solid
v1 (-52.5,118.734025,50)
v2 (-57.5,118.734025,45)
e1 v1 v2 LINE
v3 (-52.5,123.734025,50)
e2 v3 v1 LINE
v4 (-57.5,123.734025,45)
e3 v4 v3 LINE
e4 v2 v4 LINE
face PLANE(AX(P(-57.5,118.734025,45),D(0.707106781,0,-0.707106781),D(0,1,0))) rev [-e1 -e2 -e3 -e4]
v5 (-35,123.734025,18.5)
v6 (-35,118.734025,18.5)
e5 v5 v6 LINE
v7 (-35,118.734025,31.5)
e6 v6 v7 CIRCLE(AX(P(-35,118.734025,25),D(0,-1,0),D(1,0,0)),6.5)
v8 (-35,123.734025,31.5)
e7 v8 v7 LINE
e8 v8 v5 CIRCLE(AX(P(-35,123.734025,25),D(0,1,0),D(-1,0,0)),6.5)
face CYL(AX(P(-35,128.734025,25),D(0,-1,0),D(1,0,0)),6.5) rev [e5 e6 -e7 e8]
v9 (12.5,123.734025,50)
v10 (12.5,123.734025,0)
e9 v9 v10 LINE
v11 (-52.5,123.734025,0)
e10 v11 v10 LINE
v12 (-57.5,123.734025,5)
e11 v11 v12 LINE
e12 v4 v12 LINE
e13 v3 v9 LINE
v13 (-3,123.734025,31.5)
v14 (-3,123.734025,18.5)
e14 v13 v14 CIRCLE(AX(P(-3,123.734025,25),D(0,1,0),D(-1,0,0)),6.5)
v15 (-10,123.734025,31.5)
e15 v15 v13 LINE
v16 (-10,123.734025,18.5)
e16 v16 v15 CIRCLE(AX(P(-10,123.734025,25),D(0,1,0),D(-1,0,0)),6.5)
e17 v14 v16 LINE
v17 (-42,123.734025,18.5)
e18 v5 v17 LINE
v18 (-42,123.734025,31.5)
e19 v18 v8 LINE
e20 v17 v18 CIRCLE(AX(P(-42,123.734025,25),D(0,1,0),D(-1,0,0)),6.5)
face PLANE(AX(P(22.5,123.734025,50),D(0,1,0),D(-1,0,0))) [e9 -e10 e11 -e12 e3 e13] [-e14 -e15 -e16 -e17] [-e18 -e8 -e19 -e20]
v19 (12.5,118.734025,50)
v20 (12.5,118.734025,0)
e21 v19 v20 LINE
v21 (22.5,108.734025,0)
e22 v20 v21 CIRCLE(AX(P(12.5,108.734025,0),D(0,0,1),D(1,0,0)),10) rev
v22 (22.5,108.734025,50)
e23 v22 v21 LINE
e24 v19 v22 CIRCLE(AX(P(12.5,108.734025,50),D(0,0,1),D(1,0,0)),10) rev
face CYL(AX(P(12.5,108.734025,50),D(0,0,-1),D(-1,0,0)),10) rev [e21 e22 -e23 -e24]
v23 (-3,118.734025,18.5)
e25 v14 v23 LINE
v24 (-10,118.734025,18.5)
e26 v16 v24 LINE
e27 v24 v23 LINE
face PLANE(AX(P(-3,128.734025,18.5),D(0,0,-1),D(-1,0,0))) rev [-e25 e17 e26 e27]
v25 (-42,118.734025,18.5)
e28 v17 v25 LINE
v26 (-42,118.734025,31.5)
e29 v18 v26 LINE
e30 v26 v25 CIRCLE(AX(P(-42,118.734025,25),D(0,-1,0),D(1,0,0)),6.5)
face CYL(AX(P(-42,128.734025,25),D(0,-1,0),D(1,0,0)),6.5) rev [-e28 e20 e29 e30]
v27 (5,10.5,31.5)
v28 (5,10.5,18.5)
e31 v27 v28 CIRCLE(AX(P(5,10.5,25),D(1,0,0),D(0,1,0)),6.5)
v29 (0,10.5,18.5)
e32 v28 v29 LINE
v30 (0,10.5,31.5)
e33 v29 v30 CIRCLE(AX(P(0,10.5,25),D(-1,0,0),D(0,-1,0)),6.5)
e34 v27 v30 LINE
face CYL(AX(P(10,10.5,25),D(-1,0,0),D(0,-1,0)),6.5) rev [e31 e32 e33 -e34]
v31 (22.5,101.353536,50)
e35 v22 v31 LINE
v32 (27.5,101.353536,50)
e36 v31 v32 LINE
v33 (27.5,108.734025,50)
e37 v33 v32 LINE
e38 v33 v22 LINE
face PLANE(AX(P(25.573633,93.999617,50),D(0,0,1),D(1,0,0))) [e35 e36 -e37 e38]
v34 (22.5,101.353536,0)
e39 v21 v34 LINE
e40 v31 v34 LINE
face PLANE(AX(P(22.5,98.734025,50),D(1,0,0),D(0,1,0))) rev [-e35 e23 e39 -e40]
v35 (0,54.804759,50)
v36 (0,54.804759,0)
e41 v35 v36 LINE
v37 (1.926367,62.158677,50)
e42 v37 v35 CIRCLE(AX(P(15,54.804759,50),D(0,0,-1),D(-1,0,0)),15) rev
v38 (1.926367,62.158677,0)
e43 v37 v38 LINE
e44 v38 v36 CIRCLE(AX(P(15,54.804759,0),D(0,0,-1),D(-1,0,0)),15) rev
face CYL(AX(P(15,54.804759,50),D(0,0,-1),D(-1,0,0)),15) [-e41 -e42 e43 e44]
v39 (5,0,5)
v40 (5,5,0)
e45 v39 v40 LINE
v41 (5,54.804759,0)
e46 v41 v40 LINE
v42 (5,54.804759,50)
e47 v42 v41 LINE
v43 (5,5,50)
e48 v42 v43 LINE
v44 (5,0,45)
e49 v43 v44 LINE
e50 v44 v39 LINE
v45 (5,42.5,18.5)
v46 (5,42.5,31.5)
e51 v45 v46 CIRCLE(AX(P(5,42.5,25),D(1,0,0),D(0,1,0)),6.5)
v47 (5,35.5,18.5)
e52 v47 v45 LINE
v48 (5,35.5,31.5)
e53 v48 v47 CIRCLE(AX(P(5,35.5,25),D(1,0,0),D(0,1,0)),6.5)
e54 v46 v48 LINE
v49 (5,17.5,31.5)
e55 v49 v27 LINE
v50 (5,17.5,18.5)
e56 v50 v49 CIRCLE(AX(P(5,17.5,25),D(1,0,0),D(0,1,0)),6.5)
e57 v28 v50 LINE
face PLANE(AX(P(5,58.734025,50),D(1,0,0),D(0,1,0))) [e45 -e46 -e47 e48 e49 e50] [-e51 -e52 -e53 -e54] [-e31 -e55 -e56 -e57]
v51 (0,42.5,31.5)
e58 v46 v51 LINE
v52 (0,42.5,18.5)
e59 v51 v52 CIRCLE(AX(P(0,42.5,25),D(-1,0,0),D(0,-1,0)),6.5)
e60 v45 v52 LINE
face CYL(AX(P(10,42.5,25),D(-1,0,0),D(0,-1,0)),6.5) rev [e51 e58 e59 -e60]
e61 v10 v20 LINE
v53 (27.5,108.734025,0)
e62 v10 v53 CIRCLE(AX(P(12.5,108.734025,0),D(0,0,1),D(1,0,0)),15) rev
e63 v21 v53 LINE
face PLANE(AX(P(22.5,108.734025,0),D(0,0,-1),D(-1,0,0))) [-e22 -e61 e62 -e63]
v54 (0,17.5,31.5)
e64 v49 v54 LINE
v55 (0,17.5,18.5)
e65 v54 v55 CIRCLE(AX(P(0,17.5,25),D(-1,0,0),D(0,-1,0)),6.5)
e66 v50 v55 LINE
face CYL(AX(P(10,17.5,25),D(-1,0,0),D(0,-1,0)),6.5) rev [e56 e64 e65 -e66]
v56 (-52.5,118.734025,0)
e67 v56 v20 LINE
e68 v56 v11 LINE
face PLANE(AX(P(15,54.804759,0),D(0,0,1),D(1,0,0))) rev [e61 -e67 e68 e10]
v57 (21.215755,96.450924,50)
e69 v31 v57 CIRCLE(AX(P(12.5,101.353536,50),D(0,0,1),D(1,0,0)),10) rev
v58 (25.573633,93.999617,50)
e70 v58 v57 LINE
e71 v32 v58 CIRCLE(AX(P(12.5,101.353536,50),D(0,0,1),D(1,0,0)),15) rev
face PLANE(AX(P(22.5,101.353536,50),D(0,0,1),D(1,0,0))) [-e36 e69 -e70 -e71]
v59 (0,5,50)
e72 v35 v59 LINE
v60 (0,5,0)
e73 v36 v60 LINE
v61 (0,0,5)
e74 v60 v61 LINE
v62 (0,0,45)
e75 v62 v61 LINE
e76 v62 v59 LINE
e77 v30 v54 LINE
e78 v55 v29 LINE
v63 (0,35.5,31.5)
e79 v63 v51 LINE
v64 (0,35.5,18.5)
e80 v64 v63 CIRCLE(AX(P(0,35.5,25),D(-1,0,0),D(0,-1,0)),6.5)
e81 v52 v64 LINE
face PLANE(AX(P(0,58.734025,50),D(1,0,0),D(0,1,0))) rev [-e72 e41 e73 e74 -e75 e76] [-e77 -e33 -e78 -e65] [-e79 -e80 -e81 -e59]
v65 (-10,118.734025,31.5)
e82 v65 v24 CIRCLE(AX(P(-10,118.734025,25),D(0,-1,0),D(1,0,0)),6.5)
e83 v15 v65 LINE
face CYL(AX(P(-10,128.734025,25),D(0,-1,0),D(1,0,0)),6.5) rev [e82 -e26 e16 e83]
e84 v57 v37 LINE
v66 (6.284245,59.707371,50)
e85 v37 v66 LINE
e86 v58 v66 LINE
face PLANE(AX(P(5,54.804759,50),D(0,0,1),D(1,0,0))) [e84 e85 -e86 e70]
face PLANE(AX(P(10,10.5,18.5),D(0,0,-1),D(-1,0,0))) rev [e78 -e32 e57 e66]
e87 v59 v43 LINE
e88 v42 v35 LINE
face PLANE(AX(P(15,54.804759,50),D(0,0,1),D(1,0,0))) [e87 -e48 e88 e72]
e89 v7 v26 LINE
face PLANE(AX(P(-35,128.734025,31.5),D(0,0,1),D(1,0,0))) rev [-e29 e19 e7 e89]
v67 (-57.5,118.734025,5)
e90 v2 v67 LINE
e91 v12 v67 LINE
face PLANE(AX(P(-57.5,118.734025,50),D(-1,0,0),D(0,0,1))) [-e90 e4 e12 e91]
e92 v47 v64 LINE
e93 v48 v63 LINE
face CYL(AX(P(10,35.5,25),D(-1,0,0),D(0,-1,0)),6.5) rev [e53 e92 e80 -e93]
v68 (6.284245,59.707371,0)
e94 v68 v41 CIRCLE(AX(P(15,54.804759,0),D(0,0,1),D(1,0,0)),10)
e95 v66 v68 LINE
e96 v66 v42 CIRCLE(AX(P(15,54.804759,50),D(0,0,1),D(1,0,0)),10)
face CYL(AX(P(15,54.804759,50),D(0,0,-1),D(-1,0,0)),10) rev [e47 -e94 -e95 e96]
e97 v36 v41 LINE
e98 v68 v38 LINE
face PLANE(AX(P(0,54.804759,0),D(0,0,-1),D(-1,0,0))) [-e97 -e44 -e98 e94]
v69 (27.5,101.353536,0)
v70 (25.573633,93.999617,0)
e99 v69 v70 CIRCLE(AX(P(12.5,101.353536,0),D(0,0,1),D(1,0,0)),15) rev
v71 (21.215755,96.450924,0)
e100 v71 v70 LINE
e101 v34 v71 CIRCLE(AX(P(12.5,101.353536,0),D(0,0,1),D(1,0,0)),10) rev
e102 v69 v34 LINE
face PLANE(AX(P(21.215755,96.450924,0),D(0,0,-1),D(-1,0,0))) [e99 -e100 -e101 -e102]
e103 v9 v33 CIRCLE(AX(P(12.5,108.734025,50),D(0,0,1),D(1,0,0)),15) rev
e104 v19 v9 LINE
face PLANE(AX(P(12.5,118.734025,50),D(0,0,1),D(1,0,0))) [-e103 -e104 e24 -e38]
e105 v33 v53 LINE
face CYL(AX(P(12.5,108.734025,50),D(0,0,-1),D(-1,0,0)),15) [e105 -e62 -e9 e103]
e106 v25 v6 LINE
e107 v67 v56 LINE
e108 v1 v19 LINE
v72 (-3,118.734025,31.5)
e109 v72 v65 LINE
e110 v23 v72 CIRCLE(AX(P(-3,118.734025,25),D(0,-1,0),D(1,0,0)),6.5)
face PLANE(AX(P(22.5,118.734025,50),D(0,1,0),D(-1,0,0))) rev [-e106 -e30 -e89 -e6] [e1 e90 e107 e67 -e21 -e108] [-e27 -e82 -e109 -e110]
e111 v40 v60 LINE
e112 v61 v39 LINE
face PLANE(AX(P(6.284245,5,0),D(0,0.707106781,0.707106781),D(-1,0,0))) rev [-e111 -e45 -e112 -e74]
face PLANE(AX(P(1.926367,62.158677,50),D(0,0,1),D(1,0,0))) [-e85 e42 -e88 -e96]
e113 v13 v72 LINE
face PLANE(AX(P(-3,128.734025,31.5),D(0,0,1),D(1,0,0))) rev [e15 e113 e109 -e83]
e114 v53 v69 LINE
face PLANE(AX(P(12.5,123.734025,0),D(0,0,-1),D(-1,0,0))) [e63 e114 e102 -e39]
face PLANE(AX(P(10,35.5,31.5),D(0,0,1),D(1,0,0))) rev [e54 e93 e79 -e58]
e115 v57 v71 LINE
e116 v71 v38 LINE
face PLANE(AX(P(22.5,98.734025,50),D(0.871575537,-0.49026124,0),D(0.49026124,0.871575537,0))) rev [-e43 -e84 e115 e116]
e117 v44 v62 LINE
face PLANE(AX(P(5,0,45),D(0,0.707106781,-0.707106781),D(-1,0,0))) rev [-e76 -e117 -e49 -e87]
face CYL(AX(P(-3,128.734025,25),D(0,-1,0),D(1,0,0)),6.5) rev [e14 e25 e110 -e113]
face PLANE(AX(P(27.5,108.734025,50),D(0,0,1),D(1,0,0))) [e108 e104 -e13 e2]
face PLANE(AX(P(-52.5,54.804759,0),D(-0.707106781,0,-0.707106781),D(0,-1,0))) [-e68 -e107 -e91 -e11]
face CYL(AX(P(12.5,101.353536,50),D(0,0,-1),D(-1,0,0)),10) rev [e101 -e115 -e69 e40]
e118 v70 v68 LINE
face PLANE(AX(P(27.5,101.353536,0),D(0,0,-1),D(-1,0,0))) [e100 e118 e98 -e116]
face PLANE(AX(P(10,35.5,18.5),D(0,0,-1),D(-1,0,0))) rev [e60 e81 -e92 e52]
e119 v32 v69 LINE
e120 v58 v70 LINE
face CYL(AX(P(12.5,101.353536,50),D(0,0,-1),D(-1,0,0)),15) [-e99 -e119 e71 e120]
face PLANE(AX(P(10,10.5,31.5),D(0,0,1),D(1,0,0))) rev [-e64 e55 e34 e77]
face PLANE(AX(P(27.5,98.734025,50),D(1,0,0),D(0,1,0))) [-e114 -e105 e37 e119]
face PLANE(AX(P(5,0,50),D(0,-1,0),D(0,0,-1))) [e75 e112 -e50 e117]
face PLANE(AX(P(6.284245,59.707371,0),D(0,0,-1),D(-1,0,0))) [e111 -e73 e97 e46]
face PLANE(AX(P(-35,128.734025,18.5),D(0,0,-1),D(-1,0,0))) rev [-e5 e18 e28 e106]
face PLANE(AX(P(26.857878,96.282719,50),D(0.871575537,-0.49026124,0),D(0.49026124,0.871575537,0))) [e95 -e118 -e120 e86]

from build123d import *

# Parameters (mm, degrees)
SM_BASE_FLANGE_1_DEPTH = 50
OTHER_START            = -40.658639918
OTHER_1_OUTLINE_W      = 38
OTHER_1_OUTLINE_H      = 8
OTHER_1_DEPTH          = 3.535533906
OTHER_START_2          = -76.013978978
OTHER_1_2_OUTLINE_W    = 10
OTHER_1_2_OUTLINE_H    = 8
OTHER_1_2_DEPTH        = 3.535533906
OTHER_1_3_OUTLINE_W    = 7
OTHER_1_3_OUTLINE_H    = 10
OTHER_1_3_DEPTH        = 3.535533906
OTHER_START_3          = -35.355339059
OTHER_1_4_OUTLINE_W    = 7
OTHER_1_4_OUTLINE_H    = 38
OTHER_1_4_DEPTH        = 3.535533906
CUT_EXTRUDE_3_DEPTH    = 10
CUT_EXTRUDE_4_DEPTH    = 10


# Read off the part's stored shape, not the designer's step: Затупленный угол1
# Sheet-metal steps are written as plain solids
with BuildPart() as part:
    # Sketch 1 → Базовая кромка1 (new body)
    with BuildSketch(Plane.XY):
        with BuildLine():
            Line((0, 0), (0, 54.804758849))
            ThreePointArc((0, 54.804758849), (0.489581401, 58.605778722), (1.926366943, 62.158677443))
            Line((1.926366943, 62.158677443), (21.215755371, 96.450923538))
            ThreePointArc((21.215755371, 96.450923538), (22.1736124, 98.819522686), (22.5, 101.353535934))
            Line((22.5, 101.353535934), (22.5, 108.7340251))
            ThreePointArc((22.5, 108.7340251), (19.571067812, 115.805092912), (12.5, 118.7340251))
            Line((12.5, 118.7340251), (-57.5, 118.7340251))
            Line((-57.5, 118.7340251), (-57.5, 123.7340251))
            Line((-57.5, 123.7340251), (12.5, 123.7340251))
            ThreePointArc((12.5, 123.7340251), (23.106601718, 119.340626818), (27.5, 108.7340251))
            Line((27.5, 108.7340251), (27.5, 101.353535934))
            ThreePointArc((27.5, 101.353535934), (27.010418599, 97.552516061), (25.573633057, 93.99961734))
            Line((25.573633057, 93.99961734), (6.284244629, 59.707371245))
            ThreePointArc((6.284244629, 59.707371245), (5.3263876, 57.338772097), (5, 54.804758849))
            Line((5, 54.804758849), (5, 0))
            Line((5, 0), (0, 0))
        make_face()
    extrude(amount=SM_BASE_FLANGE_1_DEPTH)

    # Other 1 outline → Other 1 (cut)
    with BuildSketch(Plane(origin=(0, 0, 0), x_dir=(0.7071067811865474, 0, -0.7071067811865477), z_dir=(0.7071067811865476, 0, 0.7071067811865476)).offset(OTHER_START)):
        with Locations((-55, 121)):
            Rectangle(OTHER_1_OUTLINE_W, OTHER_1_OUTLINE_H)
    extrude(amount=OTHER_1_DEPTH, mode=Mode.SUBTRACT)

    # Other 1 2 outline → Other 1 2 (cut)
    with BuildSketch(Plane(origin=(0, 0, 0), x_dir=(0.7071067811865474, 0, 0.7071067811865477), z_dir=(0.7071067811865476, 0, -0.7071067811865476)).offset(OTHER_START_2)):
        with Locations((-5, -121)):
            Rectangle(OTHER_1_2_OUTLINE_W, OTHER_1_2_OUTLINE_H)
    extrude(amount=OTHER_1_2_DEPTH, mode=Mode.SUBTRACT)

    # Other 1 3 outline → Other 1 3 (cut)
    with BuildSketch(Plane(origin=(0, 0, 0), x_dir=(1, 0, 0), z_dir=(0, 0.7071067811865476, 0.7071067811865476))):
        with Locations((2.5, 0)):
            Rectangle(OTHER_1_3_OUTLINE_W, OTHER_1_3_OUTLINE_H)
    extrude(amount=OTHER_1_3_DEPTH, mode=Mode.SUBTRACT)

    # Other 1 4 outline → Other 1 4 (cut)
    with BuildSketch(Plane(origin=(0, 0, 0), x_dir=(1, 0, 0), z_dir=(0, 0.7071067811865476, -0.7071067811865476)).offset(OTHER_START_3)):
        with Locations((2.5, -21)):
            Rectangle(OTHER_1_4_OUTLINE_W, OTHER_1_4_OUTLINE_H)
    extrude(amount=OTHER_1_4_DEPTH, mode=Mode.SUBTRACT)

    # Эскиз4 → Вырез-Вытянуть3 (cut)
    with BuildSketch(Plane.XZ.offset(-118.7340251)):
        with BuildLine():
            Line((-35, 18.5), (-42, 18.5))
            ThreePointArc((-42, 18.5), (-48.5, 25), (-42, 31.5))
            Line((-42, 31.5), (-35, 31.5))
            ThreePointArc((-35, 31.5), (-28.5, 25), (-35, 18.5))
        make_face()
        with BuildLine():
            Line((-3, 18.5), (-10, 18.5))
            ThreePointArc((-10, 18.5), (-16.5, 25), (-10, 31.5))
            Line((-10, 31.5), (-3, 31.5))
            ThreePointArc((-3, 31.5), (3.5, 25), (-3, 18.5))
        make_face()
    extrude(amount=-CUT_EXTRUDE_3_DEPTH, mode=Mode.SUBTRACT)

    # Эскиз5 → Вырез-Вытянуть4 (cut)
    with BuildSketch(Plane.ZY):
        with BuildLine():
            Line((18.5, 10.5), (18.5, 17.5))
            ThreePointArc((18.5, 17.5), (25, 24), (31.5, 17.5))
            Line((31.5, 17.5), (31.5, 10.5))
            ThreePointArc((31.5, 10.5), (25, 4), (18.5, 10.5))
        make_face()
        with BuildLine():
            Line((18.5, 35.5), (18.5, 42.5))
            ThreePointArc((18.5, 42.5), (25, 49), (31.5, 42.5))
            Line((31.5, 42.5), (31.5, 35.5))
            ThreePointArc((31.5, 35.5), (25, 29), (18.5, 35.5))
        make_face()
    extrude(amount=-CUT_EXTRUDE_4_DEPTH, mode=Mode.SUBTRACT)


solid = part.part
